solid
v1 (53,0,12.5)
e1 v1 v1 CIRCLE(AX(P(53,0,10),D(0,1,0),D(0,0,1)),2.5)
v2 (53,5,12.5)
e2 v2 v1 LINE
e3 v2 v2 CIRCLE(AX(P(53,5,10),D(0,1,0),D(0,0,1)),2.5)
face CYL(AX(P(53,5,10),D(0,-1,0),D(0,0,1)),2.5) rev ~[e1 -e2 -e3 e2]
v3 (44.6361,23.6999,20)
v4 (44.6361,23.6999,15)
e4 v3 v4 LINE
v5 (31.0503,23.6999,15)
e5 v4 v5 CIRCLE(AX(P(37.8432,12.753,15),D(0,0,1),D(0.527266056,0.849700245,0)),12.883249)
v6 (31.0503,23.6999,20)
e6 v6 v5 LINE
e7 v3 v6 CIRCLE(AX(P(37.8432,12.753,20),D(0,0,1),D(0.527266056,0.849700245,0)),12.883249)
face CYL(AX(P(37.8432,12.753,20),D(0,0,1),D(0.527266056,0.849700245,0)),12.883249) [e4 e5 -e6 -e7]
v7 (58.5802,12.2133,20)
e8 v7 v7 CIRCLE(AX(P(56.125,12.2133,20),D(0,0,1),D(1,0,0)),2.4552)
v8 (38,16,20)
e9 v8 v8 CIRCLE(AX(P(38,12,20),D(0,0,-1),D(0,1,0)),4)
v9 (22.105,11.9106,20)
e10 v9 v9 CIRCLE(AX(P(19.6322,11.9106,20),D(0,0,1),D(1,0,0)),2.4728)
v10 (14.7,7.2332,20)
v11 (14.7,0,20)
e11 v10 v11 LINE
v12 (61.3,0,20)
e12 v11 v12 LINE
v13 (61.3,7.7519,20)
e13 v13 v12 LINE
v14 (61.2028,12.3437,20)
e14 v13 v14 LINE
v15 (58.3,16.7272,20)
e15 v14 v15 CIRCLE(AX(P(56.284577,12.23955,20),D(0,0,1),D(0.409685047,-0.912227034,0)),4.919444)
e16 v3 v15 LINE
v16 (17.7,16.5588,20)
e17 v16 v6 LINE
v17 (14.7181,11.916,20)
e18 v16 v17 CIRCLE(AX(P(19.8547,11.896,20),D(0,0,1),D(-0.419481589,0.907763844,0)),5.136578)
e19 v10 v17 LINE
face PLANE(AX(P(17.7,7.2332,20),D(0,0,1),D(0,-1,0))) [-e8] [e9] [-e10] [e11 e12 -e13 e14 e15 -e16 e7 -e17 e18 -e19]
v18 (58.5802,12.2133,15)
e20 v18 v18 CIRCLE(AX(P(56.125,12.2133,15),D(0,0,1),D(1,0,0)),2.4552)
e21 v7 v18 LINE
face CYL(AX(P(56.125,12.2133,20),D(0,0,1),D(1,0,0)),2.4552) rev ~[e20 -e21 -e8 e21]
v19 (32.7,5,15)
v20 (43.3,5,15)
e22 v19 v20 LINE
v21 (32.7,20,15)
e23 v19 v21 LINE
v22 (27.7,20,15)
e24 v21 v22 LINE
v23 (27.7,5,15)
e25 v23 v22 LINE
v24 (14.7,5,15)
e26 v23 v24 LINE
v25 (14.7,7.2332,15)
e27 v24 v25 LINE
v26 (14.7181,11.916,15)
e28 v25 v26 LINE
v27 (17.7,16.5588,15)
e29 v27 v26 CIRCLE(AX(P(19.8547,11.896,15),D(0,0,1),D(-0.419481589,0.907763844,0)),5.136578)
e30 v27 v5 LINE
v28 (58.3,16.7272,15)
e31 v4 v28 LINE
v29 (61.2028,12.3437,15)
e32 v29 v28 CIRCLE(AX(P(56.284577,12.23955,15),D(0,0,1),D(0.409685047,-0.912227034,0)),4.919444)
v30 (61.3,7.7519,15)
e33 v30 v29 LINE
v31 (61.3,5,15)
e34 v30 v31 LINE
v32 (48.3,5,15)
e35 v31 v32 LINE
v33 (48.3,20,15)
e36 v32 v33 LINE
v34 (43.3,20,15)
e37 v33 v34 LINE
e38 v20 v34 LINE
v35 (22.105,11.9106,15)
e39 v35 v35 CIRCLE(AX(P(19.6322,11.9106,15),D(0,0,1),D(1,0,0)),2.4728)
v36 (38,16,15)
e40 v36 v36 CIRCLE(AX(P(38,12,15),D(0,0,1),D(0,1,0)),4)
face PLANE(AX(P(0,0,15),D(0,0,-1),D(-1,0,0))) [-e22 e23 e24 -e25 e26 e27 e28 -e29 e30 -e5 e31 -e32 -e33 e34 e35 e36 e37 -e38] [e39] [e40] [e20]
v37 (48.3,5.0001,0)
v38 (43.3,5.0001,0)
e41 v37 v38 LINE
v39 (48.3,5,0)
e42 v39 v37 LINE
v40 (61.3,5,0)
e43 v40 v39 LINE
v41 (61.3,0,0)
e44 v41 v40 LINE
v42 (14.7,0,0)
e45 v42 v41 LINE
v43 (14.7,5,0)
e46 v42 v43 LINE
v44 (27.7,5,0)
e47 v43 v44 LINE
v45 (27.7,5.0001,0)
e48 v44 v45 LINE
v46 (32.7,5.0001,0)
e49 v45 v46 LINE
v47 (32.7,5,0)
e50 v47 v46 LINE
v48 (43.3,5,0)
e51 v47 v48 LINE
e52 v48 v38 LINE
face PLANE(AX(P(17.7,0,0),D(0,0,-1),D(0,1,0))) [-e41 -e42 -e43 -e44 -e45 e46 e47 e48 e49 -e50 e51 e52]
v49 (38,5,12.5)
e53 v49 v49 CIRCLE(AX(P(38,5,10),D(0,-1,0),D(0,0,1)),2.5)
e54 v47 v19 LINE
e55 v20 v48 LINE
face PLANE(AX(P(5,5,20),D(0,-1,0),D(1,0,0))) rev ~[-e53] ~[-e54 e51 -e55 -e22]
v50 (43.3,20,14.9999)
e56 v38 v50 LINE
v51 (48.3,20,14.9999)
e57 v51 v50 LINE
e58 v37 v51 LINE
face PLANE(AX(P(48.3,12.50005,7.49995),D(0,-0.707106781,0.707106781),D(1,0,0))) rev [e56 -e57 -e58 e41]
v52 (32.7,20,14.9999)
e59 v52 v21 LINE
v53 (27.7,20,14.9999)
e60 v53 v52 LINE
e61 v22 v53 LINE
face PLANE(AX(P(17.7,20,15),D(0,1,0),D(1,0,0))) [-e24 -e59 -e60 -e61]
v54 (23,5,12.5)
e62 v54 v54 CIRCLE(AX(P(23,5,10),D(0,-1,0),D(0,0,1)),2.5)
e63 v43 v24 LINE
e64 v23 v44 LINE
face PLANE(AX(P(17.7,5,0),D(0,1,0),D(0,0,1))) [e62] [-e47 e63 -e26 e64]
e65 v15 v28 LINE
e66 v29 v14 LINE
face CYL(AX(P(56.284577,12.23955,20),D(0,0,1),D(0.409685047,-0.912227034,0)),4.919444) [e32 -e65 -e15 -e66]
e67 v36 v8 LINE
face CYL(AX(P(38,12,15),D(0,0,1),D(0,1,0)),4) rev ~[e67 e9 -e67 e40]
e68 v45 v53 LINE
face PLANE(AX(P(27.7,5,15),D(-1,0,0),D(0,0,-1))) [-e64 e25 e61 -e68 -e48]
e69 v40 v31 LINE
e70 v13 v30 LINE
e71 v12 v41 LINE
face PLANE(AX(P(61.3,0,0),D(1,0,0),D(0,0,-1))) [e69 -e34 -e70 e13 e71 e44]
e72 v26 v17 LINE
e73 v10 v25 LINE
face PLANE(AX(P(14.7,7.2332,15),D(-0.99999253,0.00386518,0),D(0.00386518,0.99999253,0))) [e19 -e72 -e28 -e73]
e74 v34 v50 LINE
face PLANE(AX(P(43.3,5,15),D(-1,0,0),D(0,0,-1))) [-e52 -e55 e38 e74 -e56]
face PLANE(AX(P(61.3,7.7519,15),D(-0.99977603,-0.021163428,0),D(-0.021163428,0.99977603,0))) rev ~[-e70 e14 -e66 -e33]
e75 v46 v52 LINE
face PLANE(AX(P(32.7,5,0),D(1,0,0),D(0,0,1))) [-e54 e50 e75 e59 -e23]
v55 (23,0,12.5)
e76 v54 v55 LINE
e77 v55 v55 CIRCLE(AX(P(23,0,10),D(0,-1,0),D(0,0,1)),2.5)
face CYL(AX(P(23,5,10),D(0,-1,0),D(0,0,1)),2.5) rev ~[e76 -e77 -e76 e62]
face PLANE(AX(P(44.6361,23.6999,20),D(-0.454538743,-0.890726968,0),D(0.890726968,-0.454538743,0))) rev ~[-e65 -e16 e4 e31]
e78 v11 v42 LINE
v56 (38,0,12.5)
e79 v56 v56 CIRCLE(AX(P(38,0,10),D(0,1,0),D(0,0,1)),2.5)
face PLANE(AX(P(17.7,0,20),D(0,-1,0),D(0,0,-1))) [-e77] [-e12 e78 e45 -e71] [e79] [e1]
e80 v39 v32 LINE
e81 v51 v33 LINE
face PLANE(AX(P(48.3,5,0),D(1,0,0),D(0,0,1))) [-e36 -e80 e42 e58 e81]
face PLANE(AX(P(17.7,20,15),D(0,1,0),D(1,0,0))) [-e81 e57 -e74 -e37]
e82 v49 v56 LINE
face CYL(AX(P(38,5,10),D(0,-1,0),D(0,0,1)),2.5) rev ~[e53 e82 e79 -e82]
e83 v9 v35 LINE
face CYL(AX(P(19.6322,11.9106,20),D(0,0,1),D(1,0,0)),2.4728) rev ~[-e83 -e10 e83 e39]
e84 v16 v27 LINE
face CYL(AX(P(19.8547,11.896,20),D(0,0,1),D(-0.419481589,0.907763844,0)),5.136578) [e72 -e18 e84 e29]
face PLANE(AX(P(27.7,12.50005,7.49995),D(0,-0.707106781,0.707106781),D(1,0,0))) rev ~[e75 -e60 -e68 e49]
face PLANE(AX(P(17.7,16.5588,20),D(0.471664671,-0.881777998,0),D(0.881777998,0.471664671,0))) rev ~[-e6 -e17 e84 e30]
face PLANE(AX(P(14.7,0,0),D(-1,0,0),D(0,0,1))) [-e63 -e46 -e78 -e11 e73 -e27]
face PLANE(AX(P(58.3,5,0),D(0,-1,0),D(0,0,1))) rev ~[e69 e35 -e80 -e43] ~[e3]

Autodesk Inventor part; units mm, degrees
ref_plane "YZ Plane" through (0, 0, 0) normal (1, 0, 0) x (0, 1, 0)
ref_plane "XZ Plane" through (0, 0, 0) normal (0, 1, 0) x (-1, 0, 0)
ref_plane "XY Plane" through (0, 0, 0) normal (0, 0, 1) x (1, 0, 0)
sketch "Sketch1" plane through (0, 0, 0) normal (0, 0, 1) x (1, 0, 0)
  line L0 (0, 0) -> (50, 0)
  line L1 (50, 0) -> (50, 50)
  line L2 (50, 50) -> (0, 0)
  dimension "d0" = 50
  dimension "d1" = 50
extrude "Extrusion1" add sketch "Sketch1" along normal blind 20
sketch "Sketch2" plane through (0, 0, 20) normal (0, 0, 1) x (1, 0, 0)
  line L0 (50, 50) -> (0, 0) projected
  line L1 (5, 5) -> (45, 5)
  line L2 (45, 5) -> (45, 45)
  line L3 (50, 0) -> (50, 50) projected
  line L4 (0, 0) -> (50, 0) projected
  dimension "d4" = 5
  dimension "d5" = 5
extrude "Extrusion2" cut sketch "Sketch2" against normal through all contours L2 L1 L0
extrude "Extrusion3" add sketch "Sketch2" against normal blind 5 contours L2 L1 L0
sketch "Sketch3" plane through (0, 0, 0) normal (0, 0, -1) x (-1, 0, 0)
  line L0 (-12.7, 0) -> (-50, 37.3)
  line L1 (-50, 0) -> (-50, 50) projected
  line L2 (-60.6675, 53.6604) -> (-50, 37.3)
  line L3 (-60.6675, 53.6604) -> (-37.4752, 61.571)
  line L4 (-37.4752, 61.571) -> (23.8314, -5.4888)
  line L5 (23.8314, -5.4888) -> (-5.9204, -12.6802)
  line L6 (-5.9204, -12.6802) -> (-12.7, 0)
  point P0 (0, 0)
  dimension "d12" = 12.7
  dimension "d13" = 12.7
extrude "Extrusion5" cut sketch "Sketch3" against normal through all
sketch "Sketch4" plane through (0, 0, 15) normal (0, 0, -1) x (-1, 0, 0)
  line L0 (-17.7, 5) -> (-45, 32.3) projected
  line L1 (-45, 5) -> (-45, 32.3) projected
  point P0 (0, 0)
  point P1 (-38, 12)
  dimension "d17" = 7
  dimension "d27" = 7
hole "Hole1" at (38, 12, 15) direction (0, 0, 1) diameter 8 depth 25.4 tip angle 118
sketch "Sketch5" plane through (45, 5, 0) normal (-1, 0, 0) x (0, 0, 1)
  line L0 (0, 0) -> (0, 27.3) projected
  line L1 (20, -5) -> (0, -5) projected
  point P0 (10, 22)
  point P1 (10, 7)
  dimension "d28" = 10
  dimension "d29" = 10
  dimension "d30" = 15
  dimension "d31" = 12
hole "Hole2" at (45, 27, 10) at (45, 12, 10) direction (1, 0, 0) diameter 5 depth 25.4 tip angle 118
sketch "Sketch6" plane through (45, 5, 15) normal (0, 1, 0) x (1, 0, 0)
  line L0 (-27.3, 15) -> (0, 15) projected
  line L1 (5, 15) -> (5, -5) projected
  point P0 (-45, 15)
  point P1 (-7, 5)
  point P2 (-22, 5)
  dimension "d39" = 15
  dimension "d40" = 10
  dimension "d41" = 10
  dimension "d42" = 12
hole "Hole3" at (38, 5, 10) at (23, 5, 10) direction (0, -1, 0) diameter 5 depth 25.4 tip angle 118
sketch "Sketch7" plane through (0, 0, 0) normal (0, 0, -1) x (-1, 0, 0)
  line L0 (-17.7, 5) -> (-17.7, 0)
  line L1 (-12.7, 0) -> (-50, 0) projected
  line L2 (-17.7, 0) -> (-12.7, 0)
  line L3 (-12.7, 0) -> (-17.7, 5)
  line L4 (-12.7, 0) -> (-17.7, 5) projected
  line L5 (-45, 32.3) -> (-50, 32.3)
  line L6 (-50, 0) -> (-50, 37.3) projected
  line L7 (-50, 32.3) -> (-50, 37.3)
  line L8 (-50, 37.3) -> (-45, 32.3)
  line L9 (-45, 32.3) -> (-50, 37.3) projected
  point P0 (0, 0)
extrude "Extrusion6" cut sketch "Sketch7" against normal blind 25.4
sketch "Sketch8" plane through (0, 0, 0) normal (0, 0, -1) x (-1, 0, 0)
  line L0 (-17.7, 0) -> (-50, 0) projected
  line L1 (-38, 0) -> (-60.6544, 0)
  line L2 (-60.6544, 0) -> (-60.6544, 37.4521)
  line L3 (-60.6544, 37.4521) -> (-38, 37.4521)
  line L4 (-38, 37.4521) -> (-38, 0)
  circle A0 centre (-38, 12) radius 4 projected
  point P0 (0, 0)
  dimension "d52" = 0
extrude "Extrusion7" cut sketch "Sketch8" against normal through all contours L0 L1 L2 L3 L4 A0 | A0 L4 picked at (-39.3236, 12.1607)
mirror "Mirror1" about plane through (38, 37.4521, 0) normal (1, 0, 0)
sketch "Sketch9" plane through (0, 0, 15) normal (0, 0, -1) x (-1, 0, 0)
  point P0 (0, 0)
fillet "Fillet1" radius 8 1 edges at (38, 25.3, 17.5)
sketch "Sketch10" plane through (0, 0, 20) normal (0, 0, 1) x (1, 0, 0)
  arc A0 (9.2418, 17.7) -> (17.7, 5) centre (17.0156, 13.7108) ccw
  arc A1 (58.3, 5) -> (66.7582, 17.7) centre (58.9844, 13.7108) ccw
  arc A2 (66.7582, 17.7) -> (9.2418, 17.7) centre (38, 2.9422) ccw
  line L0 (17.7, 5) -> (32.3431, 19.6431)
  line L1 (32.3431, 19.6431) -> (17.7, 5) projected
  line L2 (58.3, 5) -> (43.6569, 19.6431)
  arc A3 (43.6569, 19.6431) -> (32.3431, 19.6431) centre (38, 13.9863) ccw projected
  line L3 (58.3, 5) -> (43.6569, 19.6431) projected
  arc A4 (43.6569, 19.6431) -> (32.3431, 19.6431) centre (38, 13.9863) ccw
  point P0 (0, 0)
  dimension "d56" = 8.7376
  dimension "d57" = 8.4582
  dimension "d58" = 12.7
  dimension "d59" = 12.7
  dimension "d60" = 8.4582
  dimension "d61" = 0
extrude "Extrusion8" add sketch "Sketch10" against normal up to surface (5 mm away)
sketch "Sketch11" plane through (0, 0, 20) normal (0, 0, 1) x (1, 0, 0)
  line L0 (7.4707, 29.1069) -> (71.5137, 29.1069) construction
  line L1 (71.5137, 29.1069) -> (71.5137, -5.7052) construction
  line L2 (71.5137, -5.7052) -> (7.4707, -5.7052) construction
  line L3 (7.4707, -5.7052) -> (7.4707, 29.1069) construction
  point P0 (0, 0)
sketch "Sketch12" plane through (0, 0, 20) normal (0, 0, 1) x (1, 0, 0)
  arc A0 (17.7, 16.5588) -> (17.7, 7.2332) centre (19.8547, 11.896) ccw
  line L0 (17.7, 16.5588) -> (31.0503, 23.6999)
  arc A1 (44.6361, 23.6999) -> (31.0503, 23.6999) centre (37.8432, 12.753) ccw
  line L1 (58.3, 5) -> (63.7675, 1.1638)
  line L2 (63.7675, 1.1638) -> (73.9162, 6.1166)
  line L3 (73.9162, 6.1166) -> (79.7366, 33.6983)
  line L4 (79.7366, 33.6983) -> (40.092, 40.6944)
  line L5 (40.092, 40.6944) -> (0, 39.3618)
  line L6 (0, 39.3618) -> (-15.8768, 5)
  arc A2 (-15.8768, 5) -> (-14.2095, 1.1638) centre (-13.3336, 3.8249) ccw
  line L7 (-14.2095, 1.1638) -> (10.6084, -22.6037)
  line L8 (10.6084, -22.6037) -> (17.7, 5)
  line L9 (17.7, 7.2332) -> (17.7, 5)
  line L10 (58.3, 7.7519) -> (58.3, 5)
  line L11 (44.6361, 23.6999) -> (58.3, 16.7272)
  arc A3 (58.3, 7.7519) -> (58.3, 16.7272) centre (56.2845, 12.2396) ccw
  point P0 (0, 0)
extrude "Extrusion9" cut sketch "Sketch12" against normal through all
sketch "Sketch13" plane through (0, 0, 20) normal (0, 0, 1) x (1, 0, 0)
  circle A0 centre (19.6322, 11.9106) radius 2.4728
  circle A1 centre (56.125, 12.2133) radius 2.4552
  point P0 (0, 0)
extrude "Extrusion10" cut sketch "Sketch13" against normal blind 25.4
sketch "Sketch14" plane through (17.7, 5, 15) normal (0, 1, 0) x (1, 0, 0)
  line L0 (26.9361, 0) -> (13.3503, 0) projected
  line L1 (10, 15) -> (15, 15)
  line L2 (15, 15) -> (15, 0)
  line L3 (15, 0) -> (10, 0)
  line L4 (10, 0) -> (10, 15)
  line L5 (40.6, 15) -> (0, 15) projected
  line L6 (25.6, 15) -> (30.6, 15)
  line L7 (30.6, 15) -> (30.6, 0)
  line L8 (30.6, 0) -> (25.6, 0)
  line L9 (25.6, 0) -> (25.6, 15)
  line L10 (40.6, 15) -> (40.6, 0) projected
  line L11 (0, 15) -> (0, 0) projected
  point P0 (-17.7, 15)
  dimension "d83" = 10
  dimension "d84" = 5
  dimension "d85" = 10
  dimension "d86" = 5
extrude "Extrusion11" add sketch "Sketch14" along normal blind 15 contours L0 L9 L5 L7 L8 | L0 L3 L4 L1 L2
chamfer "Chamfer1" distance 15 angle 45 2 edges at (45.8, 20, 0) (30.2, 20, 0)
sketch "Sketch15" plane through (58.3, 0, 0) normal (1, 0, 0) x (0, 0, -1)
  line L0 (-20, 7.7519) -> (-20, 0) projected
  line L1 (-20, 0) -> (0, 0) projected
  line L2 (0, 0) -> (0, 5) projected
  line L3 (0, 5) -> (-15, 5) projected
  line L4 (-15, 7.7519) -> (-15, 5) projected
  line L5 (-20, 7.7519) -> (-15, 7.7519) projected
  point P0 (0, 0)
extrude "Extrusion12" add sketch "Sketch15" along normal blind 3
sketch "Sketch16" plane through (17.7, 0, 0) normal (-1, 0, 0) x (0, 0, 1)
  line L0 (20, 7.2332) -> (20, 0) projected
  line L1 (20, 7.2332) -> (15, 7.2332) projected
  line L2 (15, 5) -> (15, 7.2332) projected
  line L3 (0, 5) -> (15, 5) projected
  line L4 (0, 0) -> (0, 5) projected
  line L5 (20, 0) -> (0, 0) projected
extrude "Extrusion13" add sketch "Sketch16" along normal blind 3
sketch "Sketch17" plane through (0, 0, 15) normal (0, 0, -1) x (-1, 0, 0)
  line L0 (-14.7, 7.2332) -> (-14.7181, 11.916)
  arc A0 (-17.7, 7.2332) -> (-17.7, 16.5588) centre (-19.8547, 11.896) ccw projected
  line L1 (-14.7181, 11.916) -> (-19.0926, 6.6114)
  line L2 (-19.0926, 6.6114) -> (-14.7, 7.2332)
  line L3 (-61.3, 7.7519) -> (-61.2028, 12.3437)
  arc A1 (-58.3, 16.7272) -> (-58.3, 7.7519) centre (-56.2845, 12.2396) ccw projected
  line L4 (-61.2028, 12.3437) -> (-58.3, 7.7519)
  line L5 (-58.3, 7.7519) -> (-58.6002, 6.2246)
  line L6 (-58.6002, 6.2246) -> (-61.3, 7.7519)
  point P0 (0, 0)
extrude "Extrusion14" add sketch "Sketch17" against normal up to surface (5 mm away) contours L2 L1 L0 | L3 A1 L5 L6
properties part number "Leadscrew Mount"
